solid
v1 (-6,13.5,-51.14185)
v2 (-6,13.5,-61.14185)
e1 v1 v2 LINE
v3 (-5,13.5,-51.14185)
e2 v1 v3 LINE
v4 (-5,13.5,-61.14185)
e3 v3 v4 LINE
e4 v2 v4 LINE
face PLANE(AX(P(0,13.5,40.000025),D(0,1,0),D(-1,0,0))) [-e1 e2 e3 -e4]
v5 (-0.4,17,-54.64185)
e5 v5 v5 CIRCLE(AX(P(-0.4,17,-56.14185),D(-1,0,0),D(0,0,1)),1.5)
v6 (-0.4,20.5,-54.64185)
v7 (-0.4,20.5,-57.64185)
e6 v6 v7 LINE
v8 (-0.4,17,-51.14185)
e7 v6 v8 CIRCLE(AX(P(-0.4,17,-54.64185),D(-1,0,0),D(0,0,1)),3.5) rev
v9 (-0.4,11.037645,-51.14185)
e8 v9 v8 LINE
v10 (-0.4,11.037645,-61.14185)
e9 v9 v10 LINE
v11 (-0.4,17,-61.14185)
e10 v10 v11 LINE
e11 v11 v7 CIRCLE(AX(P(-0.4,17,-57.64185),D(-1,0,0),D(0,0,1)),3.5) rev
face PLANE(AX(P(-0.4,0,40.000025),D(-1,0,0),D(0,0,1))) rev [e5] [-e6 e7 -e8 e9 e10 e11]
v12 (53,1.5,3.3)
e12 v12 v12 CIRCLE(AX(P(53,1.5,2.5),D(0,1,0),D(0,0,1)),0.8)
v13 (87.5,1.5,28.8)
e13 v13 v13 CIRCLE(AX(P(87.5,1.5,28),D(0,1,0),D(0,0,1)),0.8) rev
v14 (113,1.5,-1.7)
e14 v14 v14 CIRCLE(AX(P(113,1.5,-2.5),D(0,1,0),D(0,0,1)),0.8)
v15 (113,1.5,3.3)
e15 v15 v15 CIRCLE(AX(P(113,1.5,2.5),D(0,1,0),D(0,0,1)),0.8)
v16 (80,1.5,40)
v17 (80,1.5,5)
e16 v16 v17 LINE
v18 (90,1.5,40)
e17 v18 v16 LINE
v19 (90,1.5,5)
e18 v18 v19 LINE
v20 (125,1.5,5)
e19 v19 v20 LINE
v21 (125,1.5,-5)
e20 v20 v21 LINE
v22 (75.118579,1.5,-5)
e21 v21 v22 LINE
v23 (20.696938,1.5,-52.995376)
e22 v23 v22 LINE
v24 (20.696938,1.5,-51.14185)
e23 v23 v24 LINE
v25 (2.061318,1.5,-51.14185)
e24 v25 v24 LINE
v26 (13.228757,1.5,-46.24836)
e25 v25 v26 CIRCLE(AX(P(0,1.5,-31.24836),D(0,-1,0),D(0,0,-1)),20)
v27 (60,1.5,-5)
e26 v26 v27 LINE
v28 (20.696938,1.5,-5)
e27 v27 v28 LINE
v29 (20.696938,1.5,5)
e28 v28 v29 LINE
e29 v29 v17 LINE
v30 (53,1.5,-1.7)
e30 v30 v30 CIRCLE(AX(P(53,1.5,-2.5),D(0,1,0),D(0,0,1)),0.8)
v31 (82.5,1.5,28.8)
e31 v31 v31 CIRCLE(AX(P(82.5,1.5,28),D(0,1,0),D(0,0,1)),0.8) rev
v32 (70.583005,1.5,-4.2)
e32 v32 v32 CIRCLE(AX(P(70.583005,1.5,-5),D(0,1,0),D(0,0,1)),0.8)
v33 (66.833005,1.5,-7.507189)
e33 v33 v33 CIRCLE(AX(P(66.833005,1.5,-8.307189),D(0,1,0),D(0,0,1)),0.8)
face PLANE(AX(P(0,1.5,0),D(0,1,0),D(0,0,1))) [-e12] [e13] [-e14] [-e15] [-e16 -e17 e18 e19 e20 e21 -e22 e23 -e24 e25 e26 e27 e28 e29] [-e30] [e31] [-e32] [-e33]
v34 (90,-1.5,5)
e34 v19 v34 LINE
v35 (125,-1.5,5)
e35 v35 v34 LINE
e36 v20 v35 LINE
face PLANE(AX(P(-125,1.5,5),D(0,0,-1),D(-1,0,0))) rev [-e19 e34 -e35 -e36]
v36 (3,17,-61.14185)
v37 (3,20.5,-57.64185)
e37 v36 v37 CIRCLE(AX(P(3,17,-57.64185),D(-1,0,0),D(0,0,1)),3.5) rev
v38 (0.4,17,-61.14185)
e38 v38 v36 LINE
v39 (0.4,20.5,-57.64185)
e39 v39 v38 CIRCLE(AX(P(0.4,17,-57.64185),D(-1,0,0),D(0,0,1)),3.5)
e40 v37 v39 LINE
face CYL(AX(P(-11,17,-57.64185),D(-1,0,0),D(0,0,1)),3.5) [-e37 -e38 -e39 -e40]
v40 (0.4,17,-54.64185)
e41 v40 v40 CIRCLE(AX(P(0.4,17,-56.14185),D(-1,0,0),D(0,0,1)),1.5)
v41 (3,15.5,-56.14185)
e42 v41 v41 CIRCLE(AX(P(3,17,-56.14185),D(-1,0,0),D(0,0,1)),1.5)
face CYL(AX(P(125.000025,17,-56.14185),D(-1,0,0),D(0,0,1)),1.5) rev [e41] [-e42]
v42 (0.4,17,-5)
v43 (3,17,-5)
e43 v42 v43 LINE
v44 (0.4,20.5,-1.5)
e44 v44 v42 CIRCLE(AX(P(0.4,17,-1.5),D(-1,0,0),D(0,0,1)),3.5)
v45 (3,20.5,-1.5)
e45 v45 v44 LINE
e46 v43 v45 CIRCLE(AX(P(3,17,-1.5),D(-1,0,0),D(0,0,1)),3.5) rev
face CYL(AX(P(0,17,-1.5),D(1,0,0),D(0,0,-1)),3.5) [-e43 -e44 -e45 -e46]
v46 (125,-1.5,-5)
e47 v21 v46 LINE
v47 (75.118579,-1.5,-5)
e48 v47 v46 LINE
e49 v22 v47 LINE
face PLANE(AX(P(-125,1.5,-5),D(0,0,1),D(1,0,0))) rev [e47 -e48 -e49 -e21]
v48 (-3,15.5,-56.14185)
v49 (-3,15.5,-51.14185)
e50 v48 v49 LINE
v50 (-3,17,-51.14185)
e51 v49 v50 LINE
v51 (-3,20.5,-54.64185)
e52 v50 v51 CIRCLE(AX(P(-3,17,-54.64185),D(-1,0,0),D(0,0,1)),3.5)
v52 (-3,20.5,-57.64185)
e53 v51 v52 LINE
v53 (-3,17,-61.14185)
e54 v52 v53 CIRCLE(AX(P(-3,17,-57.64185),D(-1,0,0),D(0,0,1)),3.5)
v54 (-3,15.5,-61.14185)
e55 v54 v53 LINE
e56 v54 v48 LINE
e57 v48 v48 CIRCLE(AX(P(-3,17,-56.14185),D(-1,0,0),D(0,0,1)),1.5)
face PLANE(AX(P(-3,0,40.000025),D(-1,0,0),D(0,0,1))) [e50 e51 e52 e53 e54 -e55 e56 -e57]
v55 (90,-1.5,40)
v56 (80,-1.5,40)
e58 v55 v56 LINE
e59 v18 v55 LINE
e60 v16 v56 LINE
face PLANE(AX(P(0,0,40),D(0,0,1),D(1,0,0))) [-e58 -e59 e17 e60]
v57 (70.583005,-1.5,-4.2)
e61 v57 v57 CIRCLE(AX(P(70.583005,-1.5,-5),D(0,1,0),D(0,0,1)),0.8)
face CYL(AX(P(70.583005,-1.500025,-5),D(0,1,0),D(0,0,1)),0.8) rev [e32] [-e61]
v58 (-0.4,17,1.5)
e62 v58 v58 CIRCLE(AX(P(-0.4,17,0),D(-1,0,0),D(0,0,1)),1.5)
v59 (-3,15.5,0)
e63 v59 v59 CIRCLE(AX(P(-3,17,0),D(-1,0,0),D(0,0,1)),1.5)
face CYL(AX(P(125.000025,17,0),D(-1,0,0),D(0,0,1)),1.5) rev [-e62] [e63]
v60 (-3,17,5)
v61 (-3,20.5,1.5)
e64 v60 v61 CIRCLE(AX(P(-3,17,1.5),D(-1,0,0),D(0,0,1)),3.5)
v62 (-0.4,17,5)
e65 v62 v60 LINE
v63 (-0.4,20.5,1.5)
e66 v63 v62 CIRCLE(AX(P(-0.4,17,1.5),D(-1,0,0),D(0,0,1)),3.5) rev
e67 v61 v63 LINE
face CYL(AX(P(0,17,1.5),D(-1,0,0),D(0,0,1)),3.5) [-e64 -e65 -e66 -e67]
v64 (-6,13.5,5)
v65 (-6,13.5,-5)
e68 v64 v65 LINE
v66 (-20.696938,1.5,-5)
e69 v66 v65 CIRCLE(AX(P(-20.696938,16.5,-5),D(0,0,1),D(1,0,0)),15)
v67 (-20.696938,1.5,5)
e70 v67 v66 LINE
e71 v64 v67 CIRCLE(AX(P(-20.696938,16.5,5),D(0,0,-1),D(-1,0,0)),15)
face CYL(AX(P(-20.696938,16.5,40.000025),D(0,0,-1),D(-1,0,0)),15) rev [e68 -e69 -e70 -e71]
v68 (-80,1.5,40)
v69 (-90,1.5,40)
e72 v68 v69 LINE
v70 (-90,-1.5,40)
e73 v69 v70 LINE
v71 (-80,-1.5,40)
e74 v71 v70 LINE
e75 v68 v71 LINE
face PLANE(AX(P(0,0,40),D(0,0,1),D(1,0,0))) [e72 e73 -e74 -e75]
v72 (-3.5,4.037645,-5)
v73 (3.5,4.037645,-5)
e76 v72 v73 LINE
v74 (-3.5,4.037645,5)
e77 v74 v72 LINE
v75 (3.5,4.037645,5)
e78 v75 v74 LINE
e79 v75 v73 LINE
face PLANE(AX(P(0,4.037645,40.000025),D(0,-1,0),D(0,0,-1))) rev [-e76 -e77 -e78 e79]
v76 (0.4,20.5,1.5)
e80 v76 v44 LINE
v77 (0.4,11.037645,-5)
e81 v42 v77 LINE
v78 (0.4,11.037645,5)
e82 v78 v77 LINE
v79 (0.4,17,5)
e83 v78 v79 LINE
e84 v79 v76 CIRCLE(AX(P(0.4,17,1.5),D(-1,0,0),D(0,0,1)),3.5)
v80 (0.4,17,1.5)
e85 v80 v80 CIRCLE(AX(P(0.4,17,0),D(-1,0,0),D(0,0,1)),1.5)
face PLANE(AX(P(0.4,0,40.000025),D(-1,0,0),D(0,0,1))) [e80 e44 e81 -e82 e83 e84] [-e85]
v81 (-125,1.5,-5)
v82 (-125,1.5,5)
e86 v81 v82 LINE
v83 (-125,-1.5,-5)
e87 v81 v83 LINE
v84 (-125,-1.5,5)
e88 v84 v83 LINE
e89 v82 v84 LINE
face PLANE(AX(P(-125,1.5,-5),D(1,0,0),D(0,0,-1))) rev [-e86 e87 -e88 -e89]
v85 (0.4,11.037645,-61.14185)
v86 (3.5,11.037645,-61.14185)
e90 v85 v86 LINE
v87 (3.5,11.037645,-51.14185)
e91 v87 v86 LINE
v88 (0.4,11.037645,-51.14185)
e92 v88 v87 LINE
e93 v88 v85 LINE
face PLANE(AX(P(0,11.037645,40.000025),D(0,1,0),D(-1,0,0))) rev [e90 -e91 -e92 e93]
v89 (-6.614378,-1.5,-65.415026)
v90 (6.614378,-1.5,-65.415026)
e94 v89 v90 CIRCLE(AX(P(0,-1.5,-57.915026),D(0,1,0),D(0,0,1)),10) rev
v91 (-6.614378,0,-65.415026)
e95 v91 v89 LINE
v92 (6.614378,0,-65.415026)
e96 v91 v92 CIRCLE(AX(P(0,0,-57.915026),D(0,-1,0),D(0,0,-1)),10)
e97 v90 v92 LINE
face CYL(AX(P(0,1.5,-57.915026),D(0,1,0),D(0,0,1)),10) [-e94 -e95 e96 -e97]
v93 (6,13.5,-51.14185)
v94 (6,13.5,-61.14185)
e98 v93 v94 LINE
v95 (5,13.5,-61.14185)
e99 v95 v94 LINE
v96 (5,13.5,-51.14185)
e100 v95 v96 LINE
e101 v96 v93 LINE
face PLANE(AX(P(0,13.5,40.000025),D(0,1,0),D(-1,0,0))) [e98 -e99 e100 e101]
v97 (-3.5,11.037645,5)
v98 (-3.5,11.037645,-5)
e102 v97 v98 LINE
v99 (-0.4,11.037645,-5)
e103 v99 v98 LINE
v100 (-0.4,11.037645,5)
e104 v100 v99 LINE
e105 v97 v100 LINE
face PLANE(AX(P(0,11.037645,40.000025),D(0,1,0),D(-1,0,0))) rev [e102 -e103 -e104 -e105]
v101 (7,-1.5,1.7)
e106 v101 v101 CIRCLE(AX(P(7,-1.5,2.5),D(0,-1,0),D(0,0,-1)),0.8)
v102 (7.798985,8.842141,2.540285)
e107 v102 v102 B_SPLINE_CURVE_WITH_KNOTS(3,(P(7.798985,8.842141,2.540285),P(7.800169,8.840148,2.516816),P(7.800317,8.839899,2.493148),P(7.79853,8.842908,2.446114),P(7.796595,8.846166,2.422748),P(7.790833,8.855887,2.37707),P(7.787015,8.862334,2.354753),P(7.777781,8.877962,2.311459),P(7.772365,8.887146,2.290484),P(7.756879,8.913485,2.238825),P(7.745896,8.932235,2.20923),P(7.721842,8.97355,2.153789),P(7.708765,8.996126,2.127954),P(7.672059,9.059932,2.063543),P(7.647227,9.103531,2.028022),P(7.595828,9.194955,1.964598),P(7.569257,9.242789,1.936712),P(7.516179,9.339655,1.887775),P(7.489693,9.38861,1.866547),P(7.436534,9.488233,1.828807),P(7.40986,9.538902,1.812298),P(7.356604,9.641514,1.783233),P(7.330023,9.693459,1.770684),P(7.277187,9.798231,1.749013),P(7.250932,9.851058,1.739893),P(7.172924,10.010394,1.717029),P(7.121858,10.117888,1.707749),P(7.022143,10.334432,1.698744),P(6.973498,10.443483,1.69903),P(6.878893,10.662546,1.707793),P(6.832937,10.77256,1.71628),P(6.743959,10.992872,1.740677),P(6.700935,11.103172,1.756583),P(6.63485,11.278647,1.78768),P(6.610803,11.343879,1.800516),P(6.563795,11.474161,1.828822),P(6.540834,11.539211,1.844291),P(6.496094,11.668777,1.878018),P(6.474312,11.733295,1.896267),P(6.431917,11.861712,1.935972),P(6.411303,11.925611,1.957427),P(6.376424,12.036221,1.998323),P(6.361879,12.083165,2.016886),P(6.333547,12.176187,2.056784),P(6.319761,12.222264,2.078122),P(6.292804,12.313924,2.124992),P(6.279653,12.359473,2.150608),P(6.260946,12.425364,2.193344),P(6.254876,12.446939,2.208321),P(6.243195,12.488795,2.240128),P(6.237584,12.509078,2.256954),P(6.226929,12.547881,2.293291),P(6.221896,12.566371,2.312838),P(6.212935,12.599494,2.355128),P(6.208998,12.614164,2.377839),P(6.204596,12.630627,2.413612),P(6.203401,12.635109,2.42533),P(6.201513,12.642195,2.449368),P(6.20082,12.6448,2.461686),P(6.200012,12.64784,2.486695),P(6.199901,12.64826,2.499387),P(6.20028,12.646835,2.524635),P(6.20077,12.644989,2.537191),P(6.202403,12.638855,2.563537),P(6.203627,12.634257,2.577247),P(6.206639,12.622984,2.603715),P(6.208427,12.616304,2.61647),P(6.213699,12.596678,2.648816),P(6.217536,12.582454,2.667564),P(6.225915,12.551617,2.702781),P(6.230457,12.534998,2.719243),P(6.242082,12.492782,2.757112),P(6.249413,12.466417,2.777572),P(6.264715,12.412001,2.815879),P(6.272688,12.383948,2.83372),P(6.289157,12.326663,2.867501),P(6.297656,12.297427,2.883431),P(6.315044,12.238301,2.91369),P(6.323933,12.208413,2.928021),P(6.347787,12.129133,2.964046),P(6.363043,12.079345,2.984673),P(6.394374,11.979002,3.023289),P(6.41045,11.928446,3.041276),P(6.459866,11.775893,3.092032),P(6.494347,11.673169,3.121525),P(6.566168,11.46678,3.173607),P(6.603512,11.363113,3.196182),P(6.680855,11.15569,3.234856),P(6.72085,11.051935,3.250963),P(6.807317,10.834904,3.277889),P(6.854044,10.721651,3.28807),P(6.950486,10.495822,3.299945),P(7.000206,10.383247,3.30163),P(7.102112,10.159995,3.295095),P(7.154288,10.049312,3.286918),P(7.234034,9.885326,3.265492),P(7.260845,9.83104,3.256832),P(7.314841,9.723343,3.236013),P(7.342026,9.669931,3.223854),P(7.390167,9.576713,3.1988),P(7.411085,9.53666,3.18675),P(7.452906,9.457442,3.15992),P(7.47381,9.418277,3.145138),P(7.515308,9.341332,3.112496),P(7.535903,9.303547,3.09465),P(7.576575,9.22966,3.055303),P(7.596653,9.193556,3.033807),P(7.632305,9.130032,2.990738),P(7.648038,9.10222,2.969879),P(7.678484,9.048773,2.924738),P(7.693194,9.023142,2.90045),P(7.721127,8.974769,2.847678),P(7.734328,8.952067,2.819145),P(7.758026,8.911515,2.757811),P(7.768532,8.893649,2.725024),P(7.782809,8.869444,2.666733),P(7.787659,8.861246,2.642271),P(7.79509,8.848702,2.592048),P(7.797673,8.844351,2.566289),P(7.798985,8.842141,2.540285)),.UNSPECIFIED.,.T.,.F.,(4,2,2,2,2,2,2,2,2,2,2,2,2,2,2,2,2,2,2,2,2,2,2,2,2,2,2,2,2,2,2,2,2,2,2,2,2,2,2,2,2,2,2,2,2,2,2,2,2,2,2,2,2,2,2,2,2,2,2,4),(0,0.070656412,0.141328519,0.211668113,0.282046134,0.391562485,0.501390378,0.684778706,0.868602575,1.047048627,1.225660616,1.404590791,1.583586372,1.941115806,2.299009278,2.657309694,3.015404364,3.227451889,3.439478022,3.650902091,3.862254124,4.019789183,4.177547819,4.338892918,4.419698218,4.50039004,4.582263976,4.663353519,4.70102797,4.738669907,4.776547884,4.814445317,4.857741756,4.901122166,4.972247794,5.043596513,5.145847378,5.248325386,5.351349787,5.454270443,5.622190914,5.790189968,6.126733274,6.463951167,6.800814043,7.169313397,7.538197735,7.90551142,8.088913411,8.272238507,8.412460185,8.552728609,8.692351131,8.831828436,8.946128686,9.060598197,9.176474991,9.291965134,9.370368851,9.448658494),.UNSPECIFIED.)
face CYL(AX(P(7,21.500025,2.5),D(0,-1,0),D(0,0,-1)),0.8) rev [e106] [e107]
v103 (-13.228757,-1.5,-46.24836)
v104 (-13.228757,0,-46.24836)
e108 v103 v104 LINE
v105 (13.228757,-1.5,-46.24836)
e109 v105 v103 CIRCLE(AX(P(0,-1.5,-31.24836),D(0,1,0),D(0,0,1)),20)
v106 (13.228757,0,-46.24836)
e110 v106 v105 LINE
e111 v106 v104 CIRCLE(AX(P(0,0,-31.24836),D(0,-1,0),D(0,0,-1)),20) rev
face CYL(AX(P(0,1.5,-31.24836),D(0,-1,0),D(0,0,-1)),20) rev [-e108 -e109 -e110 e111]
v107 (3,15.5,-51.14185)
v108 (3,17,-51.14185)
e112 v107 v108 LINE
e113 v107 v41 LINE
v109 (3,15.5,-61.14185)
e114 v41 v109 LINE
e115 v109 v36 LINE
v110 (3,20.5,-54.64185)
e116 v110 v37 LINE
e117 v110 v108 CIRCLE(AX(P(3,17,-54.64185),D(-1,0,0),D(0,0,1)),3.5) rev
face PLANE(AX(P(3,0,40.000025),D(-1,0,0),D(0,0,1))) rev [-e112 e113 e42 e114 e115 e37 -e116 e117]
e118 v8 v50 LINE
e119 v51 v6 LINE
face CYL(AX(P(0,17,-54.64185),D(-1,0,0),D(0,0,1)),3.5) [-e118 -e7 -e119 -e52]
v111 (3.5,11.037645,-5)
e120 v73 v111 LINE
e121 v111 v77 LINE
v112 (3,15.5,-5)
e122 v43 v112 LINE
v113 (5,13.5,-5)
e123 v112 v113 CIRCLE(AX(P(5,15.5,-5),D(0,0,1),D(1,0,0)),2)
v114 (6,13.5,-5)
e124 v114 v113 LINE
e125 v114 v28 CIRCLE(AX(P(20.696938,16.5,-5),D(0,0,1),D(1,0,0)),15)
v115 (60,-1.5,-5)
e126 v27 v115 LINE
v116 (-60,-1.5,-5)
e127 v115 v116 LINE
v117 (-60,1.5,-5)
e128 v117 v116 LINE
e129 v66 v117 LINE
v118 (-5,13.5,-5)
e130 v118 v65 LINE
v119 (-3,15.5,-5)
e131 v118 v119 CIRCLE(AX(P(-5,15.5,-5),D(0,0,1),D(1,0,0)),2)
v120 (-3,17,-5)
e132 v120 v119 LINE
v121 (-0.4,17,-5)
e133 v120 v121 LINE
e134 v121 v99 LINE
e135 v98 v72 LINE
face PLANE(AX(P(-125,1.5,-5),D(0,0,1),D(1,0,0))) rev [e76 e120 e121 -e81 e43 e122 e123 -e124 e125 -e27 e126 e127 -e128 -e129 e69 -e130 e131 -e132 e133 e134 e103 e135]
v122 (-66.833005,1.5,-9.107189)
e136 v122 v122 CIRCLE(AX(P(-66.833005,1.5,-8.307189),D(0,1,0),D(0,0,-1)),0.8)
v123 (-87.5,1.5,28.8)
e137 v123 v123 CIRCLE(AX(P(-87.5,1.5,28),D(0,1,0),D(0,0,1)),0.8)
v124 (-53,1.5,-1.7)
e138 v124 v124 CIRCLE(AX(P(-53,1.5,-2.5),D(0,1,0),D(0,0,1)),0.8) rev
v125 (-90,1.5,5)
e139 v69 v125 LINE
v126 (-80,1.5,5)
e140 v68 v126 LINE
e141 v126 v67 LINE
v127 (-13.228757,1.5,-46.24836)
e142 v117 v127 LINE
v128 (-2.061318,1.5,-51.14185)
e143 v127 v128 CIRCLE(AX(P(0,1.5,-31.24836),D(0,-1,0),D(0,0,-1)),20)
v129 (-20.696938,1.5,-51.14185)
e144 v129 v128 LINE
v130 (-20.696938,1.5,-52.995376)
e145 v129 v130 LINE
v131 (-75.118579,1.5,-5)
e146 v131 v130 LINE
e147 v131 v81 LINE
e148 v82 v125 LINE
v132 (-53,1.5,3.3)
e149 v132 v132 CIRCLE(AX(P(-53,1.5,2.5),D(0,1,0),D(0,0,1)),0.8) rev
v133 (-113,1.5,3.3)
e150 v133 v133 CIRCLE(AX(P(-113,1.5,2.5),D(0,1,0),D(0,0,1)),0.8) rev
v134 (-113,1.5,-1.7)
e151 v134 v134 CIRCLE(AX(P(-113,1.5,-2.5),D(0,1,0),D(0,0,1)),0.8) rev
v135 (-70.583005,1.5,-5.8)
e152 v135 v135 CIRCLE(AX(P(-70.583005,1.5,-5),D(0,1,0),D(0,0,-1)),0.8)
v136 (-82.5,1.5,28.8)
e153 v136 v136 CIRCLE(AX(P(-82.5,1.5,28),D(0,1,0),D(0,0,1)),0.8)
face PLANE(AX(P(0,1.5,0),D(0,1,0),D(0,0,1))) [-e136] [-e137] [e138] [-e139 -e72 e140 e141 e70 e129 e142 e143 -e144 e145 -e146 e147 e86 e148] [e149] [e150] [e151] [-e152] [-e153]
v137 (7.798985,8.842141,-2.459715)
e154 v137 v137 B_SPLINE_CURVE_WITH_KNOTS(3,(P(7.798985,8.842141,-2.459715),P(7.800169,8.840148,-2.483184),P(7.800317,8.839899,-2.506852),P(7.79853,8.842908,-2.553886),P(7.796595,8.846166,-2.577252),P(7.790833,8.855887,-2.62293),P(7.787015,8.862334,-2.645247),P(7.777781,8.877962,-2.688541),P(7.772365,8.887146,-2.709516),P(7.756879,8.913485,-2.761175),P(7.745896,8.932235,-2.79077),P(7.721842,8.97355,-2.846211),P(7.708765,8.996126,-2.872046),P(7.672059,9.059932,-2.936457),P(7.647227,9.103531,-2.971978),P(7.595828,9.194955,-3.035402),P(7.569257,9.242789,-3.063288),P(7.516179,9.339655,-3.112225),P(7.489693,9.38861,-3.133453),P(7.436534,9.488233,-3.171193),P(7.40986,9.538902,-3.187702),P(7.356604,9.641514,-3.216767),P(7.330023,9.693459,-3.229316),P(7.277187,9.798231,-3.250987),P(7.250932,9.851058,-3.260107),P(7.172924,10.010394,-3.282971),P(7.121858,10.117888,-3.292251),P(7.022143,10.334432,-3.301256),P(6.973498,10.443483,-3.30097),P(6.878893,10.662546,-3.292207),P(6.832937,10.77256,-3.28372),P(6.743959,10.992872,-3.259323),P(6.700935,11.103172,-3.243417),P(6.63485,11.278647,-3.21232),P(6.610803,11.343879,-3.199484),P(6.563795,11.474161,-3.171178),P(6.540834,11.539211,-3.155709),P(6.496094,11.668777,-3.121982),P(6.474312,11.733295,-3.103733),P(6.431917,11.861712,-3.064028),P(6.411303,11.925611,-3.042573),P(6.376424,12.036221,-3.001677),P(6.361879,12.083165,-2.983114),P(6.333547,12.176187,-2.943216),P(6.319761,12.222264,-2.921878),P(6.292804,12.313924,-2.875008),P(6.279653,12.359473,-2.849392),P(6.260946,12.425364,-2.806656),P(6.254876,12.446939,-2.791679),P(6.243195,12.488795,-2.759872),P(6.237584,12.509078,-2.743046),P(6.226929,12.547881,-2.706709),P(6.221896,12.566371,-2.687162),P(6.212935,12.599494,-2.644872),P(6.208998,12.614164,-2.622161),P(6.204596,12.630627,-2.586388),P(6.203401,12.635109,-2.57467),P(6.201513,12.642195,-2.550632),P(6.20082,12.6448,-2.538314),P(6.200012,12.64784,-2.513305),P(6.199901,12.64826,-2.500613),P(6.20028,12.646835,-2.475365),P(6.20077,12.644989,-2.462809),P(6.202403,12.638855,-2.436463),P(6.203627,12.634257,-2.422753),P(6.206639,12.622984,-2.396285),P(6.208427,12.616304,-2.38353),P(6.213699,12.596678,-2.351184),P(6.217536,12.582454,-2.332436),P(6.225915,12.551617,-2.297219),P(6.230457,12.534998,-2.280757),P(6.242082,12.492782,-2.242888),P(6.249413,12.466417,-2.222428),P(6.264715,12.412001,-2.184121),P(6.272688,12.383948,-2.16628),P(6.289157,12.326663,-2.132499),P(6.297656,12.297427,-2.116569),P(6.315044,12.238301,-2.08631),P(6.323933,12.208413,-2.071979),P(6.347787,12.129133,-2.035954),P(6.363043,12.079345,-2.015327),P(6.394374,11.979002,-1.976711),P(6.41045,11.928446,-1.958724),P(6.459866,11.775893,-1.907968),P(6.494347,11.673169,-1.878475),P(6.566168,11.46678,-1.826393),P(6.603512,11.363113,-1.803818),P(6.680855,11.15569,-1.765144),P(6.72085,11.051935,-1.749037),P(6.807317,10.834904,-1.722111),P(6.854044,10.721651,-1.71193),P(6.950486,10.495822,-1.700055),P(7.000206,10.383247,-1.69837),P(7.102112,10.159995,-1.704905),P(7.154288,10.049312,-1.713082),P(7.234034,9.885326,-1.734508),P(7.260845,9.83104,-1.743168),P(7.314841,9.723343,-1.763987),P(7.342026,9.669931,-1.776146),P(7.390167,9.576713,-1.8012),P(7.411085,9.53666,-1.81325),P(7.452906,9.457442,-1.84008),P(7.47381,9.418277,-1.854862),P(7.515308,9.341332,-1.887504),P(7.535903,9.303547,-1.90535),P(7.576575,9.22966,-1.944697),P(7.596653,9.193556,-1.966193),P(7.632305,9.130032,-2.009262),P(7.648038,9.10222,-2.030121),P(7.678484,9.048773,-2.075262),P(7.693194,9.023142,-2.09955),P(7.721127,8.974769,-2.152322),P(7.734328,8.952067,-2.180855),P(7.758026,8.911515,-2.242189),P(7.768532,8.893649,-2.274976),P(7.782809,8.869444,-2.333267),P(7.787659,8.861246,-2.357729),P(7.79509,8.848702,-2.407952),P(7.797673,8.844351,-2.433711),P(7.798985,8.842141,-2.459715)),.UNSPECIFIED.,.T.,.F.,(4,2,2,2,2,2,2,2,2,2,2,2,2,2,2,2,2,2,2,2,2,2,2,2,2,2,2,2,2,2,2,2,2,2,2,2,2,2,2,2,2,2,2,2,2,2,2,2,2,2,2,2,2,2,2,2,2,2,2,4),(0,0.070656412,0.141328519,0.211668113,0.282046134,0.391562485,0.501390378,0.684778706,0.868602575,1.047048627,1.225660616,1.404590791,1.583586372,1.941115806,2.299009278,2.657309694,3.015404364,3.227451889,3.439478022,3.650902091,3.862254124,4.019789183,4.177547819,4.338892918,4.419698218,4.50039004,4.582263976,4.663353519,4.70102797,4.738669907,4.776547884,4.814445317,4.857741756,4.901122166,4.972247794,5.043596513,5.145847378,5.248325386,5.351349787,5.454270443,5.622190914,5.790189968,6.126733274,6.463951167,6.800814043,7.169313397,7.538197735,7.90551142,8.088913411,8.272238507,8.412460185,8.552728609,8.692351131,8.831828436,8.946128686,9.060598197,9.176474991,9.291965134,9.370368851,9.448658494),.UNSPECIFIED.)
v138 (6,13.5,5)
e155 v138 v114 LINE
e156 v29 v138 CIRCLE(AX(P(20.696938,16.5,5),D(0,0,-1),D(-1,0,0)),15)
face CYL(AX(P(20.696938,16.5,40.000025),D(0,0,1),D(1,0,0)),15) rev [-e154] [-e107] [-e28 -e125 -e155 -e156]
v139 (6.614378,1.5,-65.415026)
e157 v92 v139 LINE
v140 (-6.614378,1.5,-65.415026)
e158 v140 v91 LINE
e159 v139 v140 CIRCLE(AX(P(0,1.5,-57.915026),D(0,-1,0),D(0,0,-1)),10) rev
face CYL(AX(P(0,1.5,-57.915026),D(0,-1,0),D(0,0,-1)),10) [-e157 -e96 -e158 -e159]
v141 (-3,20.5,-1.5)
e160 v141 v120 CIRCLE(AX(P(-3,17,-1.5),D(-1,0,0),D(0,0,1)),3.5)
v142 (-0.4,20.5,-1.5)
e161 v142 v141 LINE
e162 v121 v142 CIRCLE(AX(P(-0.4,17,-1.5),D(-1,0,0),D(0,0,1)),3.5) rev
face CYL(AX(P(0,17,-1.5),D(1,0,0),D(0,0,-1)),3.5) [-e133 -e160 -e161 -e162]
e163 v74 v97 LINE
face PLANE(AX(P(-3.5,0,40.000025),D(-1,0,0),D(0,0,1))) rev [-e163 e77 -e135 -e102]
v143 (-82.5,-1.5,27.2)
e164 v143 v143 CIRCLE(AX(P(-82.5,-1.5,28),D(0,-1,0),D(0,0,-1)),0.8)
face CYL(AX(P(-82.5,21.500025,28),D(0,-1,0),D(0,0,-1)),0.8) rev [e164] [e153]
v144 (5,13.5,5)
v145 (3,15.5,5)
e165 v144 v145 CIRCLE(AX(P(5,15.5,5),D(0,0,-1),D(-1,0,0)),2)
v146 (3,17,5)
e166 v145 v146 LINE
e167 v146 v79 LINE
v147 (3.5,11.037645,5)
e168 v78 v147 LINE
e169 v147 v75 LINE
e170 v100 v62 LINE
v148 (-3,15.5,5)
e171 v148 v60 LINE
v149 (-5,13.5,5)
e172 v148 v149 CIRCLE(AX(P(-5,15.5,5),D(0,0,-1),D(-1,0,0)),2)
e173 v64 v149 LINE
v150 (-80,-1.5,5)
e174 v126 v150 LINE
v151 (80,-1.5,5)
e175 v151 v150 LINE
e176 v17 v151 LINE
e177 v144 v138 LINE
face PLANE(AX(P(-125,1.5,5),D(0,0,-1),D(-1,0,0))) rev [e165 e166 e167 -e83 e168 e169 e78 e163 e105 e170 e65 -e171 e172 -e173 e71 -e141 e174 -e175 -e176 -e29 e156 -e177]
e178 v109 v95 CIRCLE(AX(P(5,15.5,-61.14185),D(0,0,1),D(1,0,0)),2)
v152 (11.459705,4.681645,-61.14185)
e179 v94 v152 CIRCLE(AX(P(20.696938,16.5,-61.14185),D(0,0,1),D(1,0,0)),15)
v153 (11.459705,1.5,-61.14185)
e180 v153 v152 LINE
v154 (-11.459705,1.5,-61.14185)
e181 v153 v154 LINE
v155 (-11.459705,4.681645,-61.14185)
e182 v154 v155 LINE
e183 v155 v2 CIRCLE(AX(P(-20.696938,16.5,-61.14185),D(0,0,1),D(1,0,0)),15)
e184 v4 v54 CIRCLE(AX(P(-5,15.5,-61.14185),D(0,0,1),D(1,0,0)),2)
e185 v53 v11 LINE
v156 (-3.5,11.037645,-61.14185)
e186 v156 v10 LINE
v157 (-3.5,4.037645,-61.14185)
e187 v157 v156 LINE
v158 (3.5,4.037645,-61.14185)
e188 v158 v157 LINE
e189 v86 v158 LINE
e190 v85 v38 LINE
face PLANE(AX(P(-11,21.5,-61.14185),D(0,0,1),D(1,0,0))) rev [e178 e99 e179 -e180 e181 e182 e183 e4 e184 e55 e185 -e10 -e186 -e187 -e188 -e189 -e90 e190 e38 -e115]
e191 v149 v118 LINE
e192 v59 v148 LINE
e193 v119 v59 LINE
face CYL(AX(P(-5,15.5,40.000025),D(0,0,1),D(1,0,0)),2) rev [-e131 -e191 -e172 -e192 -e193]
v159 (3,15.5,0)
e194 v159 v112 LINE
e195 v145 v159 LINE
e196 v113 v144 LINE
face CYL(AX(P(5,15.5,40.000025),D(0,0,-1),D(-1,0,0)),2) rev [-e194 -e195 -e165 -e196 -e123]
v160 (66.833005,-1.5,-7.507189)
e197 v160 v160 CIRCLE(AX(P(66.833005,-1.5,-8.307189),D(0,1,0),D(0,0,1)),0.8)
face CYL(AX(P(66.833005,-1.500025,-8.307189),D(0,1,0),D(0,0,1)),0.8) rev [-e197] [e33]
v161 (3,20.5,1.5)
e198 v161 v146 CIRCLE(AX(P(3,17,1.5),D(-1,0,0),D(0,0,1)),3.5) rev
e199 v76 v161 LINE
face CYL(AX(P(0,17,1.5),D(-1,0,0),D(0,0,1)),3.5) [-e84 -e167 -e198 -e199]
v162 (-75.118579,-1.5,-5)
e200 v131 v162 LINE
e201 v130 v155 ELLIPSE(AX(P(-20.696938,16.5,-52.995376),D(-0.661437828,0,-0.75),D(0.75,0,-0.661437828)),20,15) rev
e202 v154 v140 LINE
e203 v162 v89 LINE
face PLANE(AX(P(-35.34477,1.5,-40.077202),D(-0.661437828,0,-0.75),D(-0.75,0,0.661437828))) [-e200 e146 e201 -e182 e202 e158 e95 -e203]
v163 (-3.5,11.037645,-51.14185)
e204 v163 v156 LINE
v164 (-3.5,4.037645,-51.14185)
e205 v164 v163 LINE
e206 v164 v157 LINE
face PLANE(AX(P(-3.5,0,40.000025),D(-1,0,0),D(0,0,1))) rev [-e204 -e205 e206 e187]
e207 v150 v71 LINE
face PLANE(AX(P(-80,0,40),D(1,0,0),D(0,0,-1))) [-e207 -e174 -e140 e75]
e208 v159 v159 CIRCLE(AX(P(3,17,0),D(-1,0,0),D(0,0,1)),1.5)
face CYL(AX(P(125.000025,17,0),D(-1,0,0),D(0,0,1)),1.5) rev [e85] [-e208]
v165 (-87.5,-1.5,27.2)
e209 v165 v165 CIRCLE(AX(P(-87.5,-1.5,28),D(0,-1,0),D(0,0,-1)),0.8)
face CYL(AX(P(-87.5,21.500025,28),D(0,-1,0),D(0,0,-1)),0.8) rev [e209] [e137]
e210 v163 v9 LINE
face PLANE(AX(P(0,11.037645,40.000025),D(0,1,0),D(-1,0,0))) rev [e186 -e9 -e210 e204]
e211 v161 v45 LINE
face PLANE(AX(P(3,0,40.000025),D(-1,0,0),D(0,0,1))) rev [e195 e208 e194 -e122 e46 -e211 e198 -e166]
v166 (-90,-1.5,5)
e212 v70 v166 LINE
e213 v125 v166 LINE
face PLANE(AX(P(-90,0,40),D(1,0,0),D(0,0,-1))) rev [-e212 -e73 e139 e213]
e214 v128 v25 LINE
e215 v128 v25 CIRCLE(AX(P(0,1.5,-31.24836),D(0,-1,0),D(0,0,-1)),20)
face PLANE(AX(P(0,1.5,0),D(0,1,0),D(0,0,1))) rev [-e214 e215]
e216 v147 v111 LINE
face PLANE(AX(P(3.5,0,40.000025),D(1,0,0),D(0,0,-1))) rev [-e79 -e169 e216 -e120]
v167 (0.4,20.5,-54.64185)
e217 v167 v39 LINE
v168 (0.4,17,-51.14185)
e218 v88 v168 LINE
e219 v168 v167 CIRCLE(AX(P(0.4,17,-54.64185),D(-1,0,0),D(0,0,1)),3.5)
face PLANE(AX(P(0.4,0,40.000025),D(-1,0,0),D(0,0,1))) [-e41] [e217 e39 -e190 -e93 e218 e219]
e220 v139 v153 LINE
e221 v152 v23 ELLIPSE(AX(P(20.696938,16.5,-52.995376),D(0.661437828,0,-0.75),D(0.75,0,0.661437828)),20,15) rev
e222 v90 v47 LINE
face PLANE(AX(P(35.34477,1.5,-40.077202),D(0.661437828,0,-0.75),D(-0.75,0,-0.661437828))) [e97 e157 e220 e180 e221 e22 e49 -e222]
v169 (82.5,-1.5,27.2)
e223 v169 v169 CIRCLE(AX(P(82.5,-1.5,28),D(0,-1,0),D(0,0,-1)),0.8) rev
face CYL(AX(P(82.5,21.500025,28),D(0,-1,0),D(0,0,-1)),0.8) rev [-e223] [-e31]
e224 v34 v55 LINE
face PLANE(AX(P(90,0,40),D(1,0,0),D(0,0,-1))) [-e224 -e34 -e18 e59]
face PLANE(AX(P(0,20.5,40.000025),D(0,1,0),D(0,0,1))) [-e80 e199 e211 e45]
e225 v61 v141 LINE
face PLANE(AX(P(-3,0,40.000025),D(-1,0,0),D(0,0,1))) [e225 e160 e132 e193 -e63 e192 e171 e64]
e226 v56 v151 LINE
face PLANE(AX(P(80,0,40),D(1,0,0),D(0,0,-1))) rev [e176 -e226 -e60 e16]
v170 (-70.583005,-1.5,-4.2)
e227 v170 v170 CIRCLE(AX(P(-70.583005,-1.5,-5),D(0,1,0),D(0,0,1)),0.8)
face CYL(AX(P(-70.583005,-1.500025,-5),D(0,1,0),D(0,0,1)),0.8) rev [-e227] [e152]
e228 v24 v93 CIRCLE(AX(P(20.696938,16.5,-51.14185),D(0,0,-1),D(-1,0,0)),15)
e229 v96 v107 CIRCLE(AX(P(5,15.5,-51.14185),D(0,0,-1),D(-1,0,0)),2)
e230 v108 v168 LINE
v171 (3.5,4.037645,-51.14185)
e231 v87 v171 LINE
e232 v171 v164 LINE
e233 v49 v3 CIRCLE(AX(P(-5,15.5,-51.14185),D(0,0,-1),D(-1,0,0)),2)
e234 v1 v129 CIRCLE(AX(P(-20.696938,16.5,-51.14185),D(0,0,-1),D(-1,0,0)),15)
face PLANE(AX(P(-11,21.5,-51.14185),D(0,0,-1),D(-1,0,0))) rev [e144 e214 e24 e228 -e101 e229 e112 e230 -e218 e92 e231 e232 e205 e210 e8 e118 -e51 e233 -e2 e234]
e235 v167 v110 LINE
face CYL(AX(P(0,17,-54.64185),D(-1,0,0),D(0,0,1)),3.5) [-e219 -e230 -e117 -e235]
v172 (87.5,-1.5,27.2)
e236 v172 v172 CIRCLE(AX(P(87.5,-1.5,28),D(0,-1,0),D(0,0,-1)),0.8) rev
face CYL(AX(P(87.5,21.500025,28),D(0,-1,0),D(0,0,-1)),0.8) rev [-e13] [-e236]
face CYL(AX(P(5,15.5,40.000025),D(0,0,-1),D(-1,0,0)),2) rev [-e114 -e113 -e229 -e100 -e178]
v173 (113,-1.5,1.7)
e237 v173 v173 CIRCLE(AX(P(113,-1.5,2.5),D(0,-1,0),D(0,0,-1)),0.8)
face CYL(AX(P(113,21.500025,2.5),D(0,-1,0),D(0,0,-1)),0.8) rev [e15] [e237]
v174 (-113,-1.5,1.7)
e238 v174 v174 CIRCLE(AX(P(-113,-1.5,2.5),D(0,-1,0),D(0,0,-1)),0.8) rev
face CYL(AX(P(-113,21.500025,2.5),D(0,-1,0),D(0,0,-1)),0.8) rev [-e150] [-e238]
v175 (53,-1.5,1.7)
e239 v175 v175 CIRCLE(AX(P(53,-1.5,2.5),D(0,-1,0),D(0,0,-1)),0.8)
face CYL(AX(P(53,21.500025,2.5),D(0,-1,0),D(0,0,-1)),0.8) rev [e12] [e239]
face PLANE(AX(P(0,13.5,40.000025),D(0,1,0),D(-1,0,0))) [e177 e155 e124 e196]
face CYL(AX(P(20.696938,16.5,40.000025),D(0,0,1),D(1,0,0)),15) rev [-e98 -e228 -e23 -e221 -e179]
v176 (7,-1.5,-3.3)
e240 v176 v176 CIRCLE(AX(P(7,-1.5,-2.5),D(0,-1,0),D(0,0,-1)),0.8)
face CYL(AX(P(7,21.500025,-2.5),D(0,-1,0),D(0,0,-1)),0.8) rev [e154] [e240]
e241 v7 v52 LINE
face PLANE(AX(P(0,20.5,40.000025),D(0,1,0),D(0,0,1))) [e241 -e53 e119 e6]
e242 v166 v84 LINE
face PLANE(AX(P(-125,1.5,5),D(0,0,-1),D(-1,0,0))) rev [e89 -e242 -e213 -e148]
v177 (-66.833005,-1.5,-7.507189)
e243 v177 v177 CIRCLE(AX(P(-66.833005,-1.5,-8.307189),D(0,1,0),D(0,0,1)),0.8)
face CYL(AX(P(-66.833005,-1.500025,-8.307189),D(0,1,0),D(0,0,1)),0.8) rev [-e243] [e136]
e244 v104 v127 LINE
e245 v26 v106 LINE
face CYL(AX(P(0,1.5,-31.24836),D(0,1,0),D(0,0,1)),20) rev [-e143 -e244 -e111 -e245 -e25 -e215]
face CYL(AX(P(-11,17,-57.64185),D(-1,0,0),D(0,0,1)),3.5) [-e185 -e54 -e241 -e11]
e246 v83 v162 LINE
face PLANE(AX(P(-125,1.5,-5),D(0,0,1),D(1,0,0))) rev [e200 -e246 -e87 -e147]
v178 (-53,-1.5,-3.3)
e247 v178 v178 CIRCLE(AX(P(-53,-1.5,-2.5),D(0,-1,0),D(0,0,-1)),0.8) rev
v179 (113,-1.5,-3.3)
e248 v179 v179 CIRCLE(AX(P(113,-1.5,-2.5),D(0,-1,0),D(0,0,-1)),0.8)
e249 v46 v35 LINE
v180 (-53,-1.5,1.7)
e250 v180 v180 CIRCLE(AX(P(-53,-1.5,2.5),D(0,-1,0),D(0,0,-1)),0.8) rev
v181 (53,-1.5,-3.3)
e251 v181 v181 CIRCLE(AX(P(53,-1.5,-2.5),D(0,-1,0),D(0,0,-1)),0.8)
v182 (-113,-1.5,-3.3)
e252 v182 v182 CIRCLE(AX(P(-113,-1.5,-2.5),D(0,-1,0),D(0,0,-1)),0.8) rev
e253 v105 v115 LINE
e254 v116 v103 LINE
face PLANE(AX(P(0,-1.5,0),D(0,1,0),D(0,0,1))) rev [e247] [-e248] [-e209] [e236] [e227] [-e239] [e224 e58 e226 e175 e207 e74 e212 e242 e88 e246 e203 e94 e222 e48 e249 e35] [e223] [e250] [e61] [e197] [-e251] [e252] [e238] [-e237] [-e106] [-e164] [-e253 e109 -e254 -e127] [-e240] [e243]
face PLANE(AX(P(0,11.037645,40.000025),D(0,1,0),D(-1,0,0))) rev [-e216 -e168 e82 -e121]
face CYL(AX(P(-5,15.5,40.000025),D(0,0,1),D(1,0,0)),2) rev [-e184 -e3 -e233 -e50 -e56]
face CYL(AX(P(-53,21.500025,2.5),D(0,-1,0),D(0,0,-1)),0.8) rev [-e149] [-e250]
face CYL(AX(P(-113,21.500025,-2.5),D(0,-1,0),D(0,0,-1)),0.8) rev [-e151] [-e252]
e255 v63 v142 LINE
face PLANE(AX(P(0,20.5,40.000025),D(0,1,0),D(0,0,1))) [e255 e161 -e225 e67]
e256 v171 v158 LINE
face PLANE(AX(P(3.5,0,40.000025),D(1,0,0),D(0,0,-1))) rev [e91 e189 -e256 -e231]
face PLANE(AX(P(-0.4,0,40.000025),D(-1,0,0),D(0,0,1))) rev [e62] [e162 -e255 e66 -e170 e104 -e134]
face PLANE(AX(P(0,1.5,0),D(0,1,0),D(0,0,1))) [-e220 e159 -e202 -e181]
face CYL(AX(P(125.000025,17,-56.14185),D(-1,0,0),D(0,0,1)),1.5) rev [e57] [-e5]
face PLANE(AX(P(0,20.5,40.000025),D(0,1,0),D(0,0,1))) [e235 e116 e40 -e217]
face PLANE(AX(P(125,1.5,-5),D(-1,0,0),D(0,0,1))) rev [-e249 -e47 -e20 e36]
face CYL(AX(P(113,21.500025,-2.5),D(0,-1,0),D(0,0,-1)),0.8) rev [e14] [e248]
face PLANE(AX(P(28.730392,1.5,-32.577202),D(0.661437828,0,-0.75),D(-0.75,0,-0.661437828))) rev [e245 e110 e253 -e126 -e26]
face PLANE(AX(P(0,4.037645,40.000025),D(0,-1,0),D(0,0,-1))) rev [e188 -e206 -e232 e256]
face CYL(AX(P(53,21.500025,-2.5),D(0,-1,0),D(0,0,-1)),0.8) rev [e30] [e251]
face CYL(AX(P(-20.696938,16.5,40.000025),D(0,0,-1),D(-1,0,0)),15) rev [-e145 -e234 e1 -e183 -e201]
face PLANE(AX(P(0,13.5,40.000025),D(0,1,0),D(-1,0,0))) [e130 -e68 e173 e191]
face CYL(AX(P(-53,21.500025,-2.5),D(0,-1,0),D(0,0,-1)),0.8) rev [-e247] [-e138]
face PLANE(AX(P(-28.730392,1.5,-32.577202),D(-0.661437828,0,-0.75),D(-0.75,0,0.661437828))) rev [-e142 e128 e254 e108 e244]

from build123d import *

# Parameters (mm, degrees)
EXTRUDE_1_DEPTH      = 1.5
EXTRUDE_10_DEPTH     = 1.5
FILLET_1_R           = 10
FILLET_2_R           = 20
EXTRUDE_11_DEPTH     = 20
EXTRUDE_13_DEPTH     = 35
EXTRUDE_14_DEPTH     = 35
EXTRUDE_15_DEPTH     = 1.5
FILLET_5_R           = 20
FILLET_6_R           = 10
SKETCH_58_R          = 0.8000000000000042
SKETCH_58_R_2        = 0.8000000000000055
SKETCH_58_R_3        = 0.8000000000000044
SKETCH_58_R_4        = 0.7999999999999963
SKETCH_58_R_5        = 0.8000000000000119
SKETCH_58_R_6        = 0.7999999999999946
SKETCH_58_R_7        = 0.7999999999999954
SKETCH_58_R_8        = 0.7999999999999948
SKETCH_58_R_9        = 0.8000000000000026
CUT_EXTRUDE_52_DEPTH = 145.10569310974057
SKETCH_26_W          = 22
SKETCH_26_H          = 10
EXTRUDE_16_DEPTH     = 20
CUT_EXTRUDE_53_DEPTH = 163.22491745731594
FILLET_7_R           = 15
FILLET_8_R           = 15
FILLET_9_R           = 3.5
SKETCH_60_R          = 1.5000000000000042
CUT_EXTRUDE_54_DEPTH = 147.3444593643323
SKETCH_61_R          = 1.5000000000000004
CUT_EXTRUDE_55_DEPTH = 147.3444593643323
FILLET_10_R          = 2
SKETCH_63_R          = 0.7999999999999954
CUT_EXTRUDE_56_DEPTH = 144.52160390212592


# Some blends are built 0.0001 mm under size
with BuildPart() as part:
    # 草图1 → 凸台-拉伸1 (new body)
    with BuildSketch(Plane(origin=(0, 0, 0), x_dir=(1, 0, 0), z_dir=(0, 1, 0))):
        Polygon((-125, 4.999999999999984), (124.99999999999996, 4.999999999999984), (124.99999999999996, -5.0000000000000115), (-125.00000000000003, -5.0000000000000115), align=None)
    extrude(amount=EXTRUDE_1_DEPTH)



with BuildPart() as body_2:
    # 草图22 → 凸台-拉伸10 (new body)
    with BuildSketch(Plane.XZ):
        Polygon((-3.09e-14, -71.24835955462486), (-3.362e-14, -57.91502622129154), (-60.00000000000021, -4.9999999999999805), (-75.11857892036937, -4.9999999999999805), align=None)
        Polygon((60.00000000000021, -4.9999999999999645), (1.388e-14, -57.91502622129154), (-3.09e-14, -71.24835955462486), (75.1185789203694, -4.999999999999957), align=None)
    extrude(amount=-EXTRUDE_10_DEPTH)

    # 圆角1
    fillet_1_edges = [body_2.edges().sort_by_distance(p)[0] for p in [
        (-8.35e-15, 0.75, -71.24835955462484),
    ]]
    fillet(fillet_1_edges, radius=FILLET_1_R)

    # 圆角2
    fillet_2_edges = [body_2.edges().sort_by_distance(p)[0] for p in [
        (-9.71e-15, 0.75, -57.91502622129154),
    ]]
    fillet(fillet_2_edges, radius=FILLET_2_R)


with BuildPart() as part_1:
    add(part.part)

    add(body_2.part)  # 凸台-拉伸11 merges body 2
    # 草图24 → 凸台-拉伸11 (add)
    with BuildSketch(Plane(origin=(0, 1.5, 0), x_dir=(1, 0, 0), z_dir=(0, 1, 0))):
        Polygon((-10.000000000000004, 4.999999999999999), (9.999999999999996, 4.999999999999999), (9.999999999999996, -5.000000000000001), (-10.000000000000002, -5.000000000000001), align=None)
    extrude(amount=EXTRUDE_11_DEPTH)

    # 草图41 → 凸台-拉伸13 (add)
    with BuildSketch(Plane.XY.offset(5.0000000000000115)):
        Polygon((89.99999999999996, 1.4999999999999951), (79.99999999999996, 1.4999999999999951), (79.99999999999996, -4.88e-15), (89.99999999999996, -4.99e-15), (89.99999999999996, 0.7499999999999958), align=None)
    extrude(amount=EXTRUDE_13_DEPTH)

    # 草图42 → 凸台-拉伸14 (add)
    with BuildSketch(Plane.XY.offset(5.0000000000000115)):
        Polygon((-80, 1.4999999999999998), (-90, 1.4999999999999998), (-90, 0.75), (-90, -2.2e-16), (-80, -2.2e-16), align=None)
    extrude(amount=EXTRUDE_14_DEPTH)

    # 草图57 → 凸台-拉伸15 (add)
    with BuildSketch(Plane(origin=(0, 0, 0), x_dir=(-1, 0, 0), z_dir=(0, -1, 0))):
        Polygon((125.00000000000003, -5.0000000000000115), (90, -5.0000000000000115), (90, -40.000000000000014), (80, -40.000000000000014), (80, -5.0000000000000115), (-79.99999999999996, -5.0000000000000115), (-79.99999999999996, -40.000000000000014), (-89.99999999999996, -40.000000000000014), (-89.99999999999994, -5.0000000000000115), (-124.99999999999996, -5.0000000000000115), (-124.99999999999996, 4.999999999999984), (-75.11857892036936, 4.999999999999984), (-6.614378277661482, 65.41502622129155), (-3.024e-14, 71.24835955462483), (6.614378277661415, 65.41502622129157), (75.11857892036936, 4.999999999999984), (125, 4.999999999999984), align=None)
        Polygon((60.00000000000022, 4.999999999999984), (-60.00000000000011, 4.999999999999984), (-2.082e-14, 57.915026221291534), align=None, mode=Mode.SUBTRACT)
    extrude(amount=EXTRUDE_15_DEPTH)

    # 圆角5
    fillet_5_edges = [part_1.edges().sort_by_distance(p)[0] for p in [
        (2.082e-14, -0.75, -57.915026221291534),
    ]]
    fillet(fillet_5_edges, radius=FILLET_5_R)

    # 圆角6
    fillet_6_edges = [part_1.edges().sort_by_distance(p)[0] for p in [
        (3.024e-14, -0.75, -71.24835955462483),
    ]]
    fillet(fillet_6_edges, radius=FILLET_6_R)

    # 草图58 → 切除-拉伸52 (cut, through all)
    with BuildSketch(Plane.XZ.offset(1.5)):
        with Locations(Location((7, 2.499999999999986, 0), (0, 0, 270))):
            Circle(SKETCH_58_R)
        with Locations(Location((6.999999999999998, -2.5000000000000147, 0), (0, 0, 270))):
            Circle(SKETCH_58_R_2)
        with Locations(Location((53, 2.5000000000000027, 0), (0, 0, 270))):
            Circle(SKETCH_58_R_3)
        with Locations(Location((53.000000000000014, -2.5000000000000027, 0), (0, 0, 270))):
            Circle(SKETCH_58_R_4)
        with Locations(Location((112.99999999999994, 2.5000000000000138, 0), (0, 0, 270))):
            Circle(SKETCH_58_R_5)
        with Locations(Location((112.99999999999997, -2.500000000000007, 0), (0, 0, 270))):
            Circle(SKETCH_58_R_6)
        with Locations(Location((-87.5, 28.000000000000014, 0), (0, 0, 270))):
            Circle(SKETCH_58_R_7)
        with Locations(Location((-82.49999999999999, 28.000000000000007, 0), (0, 0, 270))):
            Circle(SKETCH_58_R_8)
        with Locations(Location((-112.99999999999996, -2.5, 0), (0, 0, 270))):
            Circle(SKETCH_58_R_7)
        with Locations(Location((-112.99999999999996, 2.4999999999999987, 0), (0, 0, 270))):
            Circle(SKETCH_58_R_7)
        with Locations(Location((-53, -2.5, 0), (0, 0, 270))):
            Circle(SKETCH_58_R_9)
        with Locations(Location((-53, 2.5, 0), (0, 0, 270))):
            Circle(SKETCH_58_R_9)
        with Locations(Location((82.49999999999999, 28.000000000000036, 0), (0, 0, 270))):
            Circle(SKETCH_58_R_7)
        with Locations(Location((87.5, 28.000000000000036, 0), (0, 0, 270))):
            Circle(SKETCH_58_R_7)
    extrude(amount=-CUT_EXTRUDE_52_DEPTH, mode=Mode.SUBTRACT)

    # 草图26 → 凸台-拉伸16 (add)
    with BuildSketch(Plane(origin=(0, 1.5, 0), x_dir=(1, 0, 0), z_dir=(0, 1, 0))):
        with Locations((-1.78e-15, 56.141850111775966)):
            Rectangle(SKETCH_26_W, SKETCH_26_H)
    extrude(amount=EXTRUDE_16_DEPTH)

    # 草图59 → 切除-拉伸53 (cut, through all)
    with BuildSketch(Plane(origin=(1.928e-14, 0, -61.14185011177596), x_dir=(-1, 0, -3.2e-16), z_dir=(3.2e-16, 0, -1))):
        Polygon((5.999999999999998, 13.5), (5.999999999999998, 1.5), (11.000000000000021, 1.5), (11.00000000000002, 21.5), (-10.99999999999998, 21.5), (-10.999999999999979, 1.5), (-6, 1.5), (-6.000000000000002, 13.499999999999996), (-3.0000000000000018, 13.499999999999996), (-3.0000000000000018, 20.499999999999996), (-0.40000000000000174, 20.499999999999996), (-1.73e-15, 20.499999999999996), (0.3999999999999983, 20.499999999999996), (2.9999999999999982, 20.499999999999996), (2.9999999999999982, 13.499999999999996), align=None)
        Polygon((-3.5000000000000013, 4.037645071572423), (-1.78e-15, 4.037645071572423), (3.4999999999999982, 4.037645071572423), (3.4999999999999982, 11.037645071572424), (0.927810105733712, 11.037645071572424), (0.3999999999999977, 11.037645071572424), (-1.78e-15, 11.037645071572424), (-0.4000000000000017, 11.037645071572422), (-3.5000000000000018, 11.037645071572422), align=None)
        Polygon((-0.4000000000000018, 13.499999999999996), (-0.4000000000000018, 11.037645071572424), (-1.78e-15, 11.037645071572424), (0.3999999999999977, 11.037645071572424), (0.3999999999999976, 13.499999999999996), (-1.78e-15, 13.499999999999998), align=None)
        Polygon((-0.40000000000000174, 20.499999999999996), (-0.4000000000000018, 13.499999999999996), (-1.78e-15, 13.499999999999998), (-1.73e-15, 20.499999999999996), align=None)
        Polygon((-1.78e-15, 13.499999999999998), (0.3999999999999977, 13.499999999999998), (0.3999999999999983, 20.499999999999996), (-1.73e-15, 20.499999999999996), align=None)
    extrude(amount=-CUT_EXTRUDE_53_DEPTH, mode=Mode.SUBTRACT)

    # 圆角7
    # the kernel refuses this fillet: 15 mm, written as the material it adds along each edge
    with BuildSketch(Plane(origin=(6.0000000000000195, 1.5, -61.14185011177596), x_dir=(1, 0, 3.2e-16), z_dir=(-3.2e-16, 0, 1))) as fillet_7_piece_1_section:
        with BuildLine():
            CenterArc((14.696938456699067, 15), FILLET_7_R, 191.5369590328155, 78.4630409671845)
            Line((1.78e-15, 11.999999999999996), (0, 0))
            Line((0, 0), (14.696938456699067, 0))
        make_face()
    fillet_7_piece_1 = extrude(amount=9.999999999999993, mode=Mode.PRIVATE)
    fillet_7_piece_1 = split(fillet_7_piece_1, bisect_by=Plane(origin=(8.388620739132056, 1.5, -63.85029144843083), z_dir=(-0.6614378277661448, 0, 0.7500000000000027)), keep=Keep.TOP, mode=Mode.PRIVATE)
    add(fillet_7_piece_1)
    with BuildSketch(Plane(origin=(-5.99999999999998, 1.5, -61.14185011177596), x_dir=(-1, 0, -3.2e-16), z_dir=(-3.2e-16, 0, 1))) as fillet_7_piece_2_section:
        with BuildLine():
            CenterArc((14.696938456699073, -15), FILLET_7_R, 90, 78.46304096718453)
            Line((8.9e-16, -12), (0, 0))
            Line((0, 0), (14.696938456699073, 0))
        make_face()
    fillet_7_piece_2 = extrude(amount=9.999999999999993, mode=Mode.PRIVATE)
    fillet_7_piece_2 = split(fillet_7_piece_2, bisect_by=Plane(origin=(-8.388620739132019, 1.5, -63.85029144843084), z_dir=(0.6614378277661446, 0, 0.7500000000000028)), keep=Keep.TOP, mode=Mode.PRIVATE)
    add(fillet_7_piece_2)

    # 圆角8
    # the kernel refuses this fillet: 15 mm, written as the material it adds along each edge
    with BuildSketch(Plane(origin=(6.000000000000002, 1.5, -4.999999999999986), x_dir=(1, 0, 3.2e-16), z_dir=(-3.2e-16, 0, 1))) as fillet_8_piece_1_section:
        with BuildLine():
            CenterArc((14.69693845669907, 15), FILLET_8_R, 191.5369590328155, 78.4630409671845)
            Line((1.78e-15, 11.999999999999996), (0, 0))
            Line((0, 0), (14.69693845669907, 0))
        make_face()
    fillet_8_piece_1 = extrude(amount=9.999999999999993, mode=Mode.PRIVATE)
    fillet_8_piece_1 = fillet_8_piece_1 - Plane(origin=(6.999999999999998, 1.5, -2.5000000000000147), x_dir=(-1.8e-16, 0, -1), z_dir=(0, -1, 0)) * Cylinder(0.8000000000000055, 79, mode=Mode.PRIVATE)
    fillet_8_piece_1 = fillet_8_piece_1 - Plane(origin=(7, 1.5, 2.499999999999986), x_dir=(-1.8e-16, 0, -1), z_dir=(0, -1, 0)) * Cylinder(0.8000000000000042, 79, mode=Mode.PRIVATE)
    add(fillet_8_piece_1)
    with BuildSketch(Plane(origin=(-5.999999999999997, 1.5, -4.999999999999986), x_dir=(-1, 0, -3.2e-16), z_dir=(-3.2e-16, 0, 1))) as fillet_8_piece_2:
        with BuildLine():
            CenterArc((14.696938456699069, -15), FILLET_8_R, 90, 78.4630409671845)
            Line((8.9e-16, -12), (0, 0))
            Line((0, 0), (14.696938456699069, 0))
        make_face()
    extrude(amount=9.999999999999993)

    # 圆角9
    fillet_9_edges = [part_1.edges().sort_by_distance(p)[0] for p in [
        (-1.6999999999999824, 20.499999999999996, -51.141850111775966),
        (1.700000000000018, 20.499999999999996, -51.141850111775966),
        (1.7000000000000028, 20.499999999999996, 5.000000000000009),
        (1.700000000000021, 20.499999999999996, -61.14185011177596),
        (-1.7000000000000028, 20.499999999999996, 5.000000000000009),
        (-1.699999999999979, 20.499999999999996, -61.14185011177596),
        (1.70000000000001, 20.499999999999996, -4.999999999999985),
        (-1.6999999999999957, 20.499999999999996, -4.999999999999985),
    ]]
    fillet(fillet_9_edges, radius=FILLET_9_R)

    # 草图60 → 切除-拉伸54 (cut, through all)
    with BuildSketch(Plane.ZY.offset(2.9999999999999987)):
        with Locations((-56.14185011177597, 16.999999999999996)):
            Circle(SKETCH_60_R)
    extrude(amount=-CUT_EXTRUDE_54_DEPTH, mode=Mode.SUBTRACT)

    # 草图61 → 切除-拉伸55 (cut, through all)
    with BuildSketch(Plane.ZY.offset(2.9999999999999987)):
        with Locations((4.3e-16, 16.999999999999996)):
            Circle(SKETCH_61_R)
    extrude(amount=-CUT_EXTRUDE_55_DEPTH, mode=Mode.SUBTRACT)

    # 圆角10
    fillet_10_edges = [part_1.edges().sort_by_distance(p)[0] for p in [
        (3.0000000000000018, 13.499999999999996, 7.11e-15),
        (3.000000000000019, 13.499999999999996, -56.141850111775966),
        (-2.9999999999999982, 13.499999999999998, 7.11e-15),
        (-2.999999999999981, 13.499999999999998, -56.141850111775966),
    ]]
    fillet(fillet_10_edges, radius=FILLET_10_R - 0.0001)  # a hair under: the kernel refuses the full size

    # 草图63 → 切除-拉伸56 (cut, through all)
    with BuildSketch(Plane(origin=(0, 1.5, 0), x_dir=(1, 0, 0), z_dir=(0, 1, 0))):
        with Locations(Location((70.5830052442586, 4.999999999999985, 0), (0, 0, 270))):
            Circle(SKETCH_63_R)
        with Locations(Location((66.83300524425859, 8.307189138830706, 0), (0, 0, 270))):
            Circle(SKETCH_63_R)
        with Locations(Location((-66.83300524425859, 8.307189138830706, 0), (0, 0, 270))):
            Circle(SKETCH_63_R)
        with Locations(Location((-70.5830052442586, 4.999999999999985, 0), (0, 0, 270))):
            Circle(SKETCH_63_R)
    extrude(amount=-CUT_EXTRUDE_56_DEPTH, mode=Mode.SUBTRACT)


solid = part_1.part
